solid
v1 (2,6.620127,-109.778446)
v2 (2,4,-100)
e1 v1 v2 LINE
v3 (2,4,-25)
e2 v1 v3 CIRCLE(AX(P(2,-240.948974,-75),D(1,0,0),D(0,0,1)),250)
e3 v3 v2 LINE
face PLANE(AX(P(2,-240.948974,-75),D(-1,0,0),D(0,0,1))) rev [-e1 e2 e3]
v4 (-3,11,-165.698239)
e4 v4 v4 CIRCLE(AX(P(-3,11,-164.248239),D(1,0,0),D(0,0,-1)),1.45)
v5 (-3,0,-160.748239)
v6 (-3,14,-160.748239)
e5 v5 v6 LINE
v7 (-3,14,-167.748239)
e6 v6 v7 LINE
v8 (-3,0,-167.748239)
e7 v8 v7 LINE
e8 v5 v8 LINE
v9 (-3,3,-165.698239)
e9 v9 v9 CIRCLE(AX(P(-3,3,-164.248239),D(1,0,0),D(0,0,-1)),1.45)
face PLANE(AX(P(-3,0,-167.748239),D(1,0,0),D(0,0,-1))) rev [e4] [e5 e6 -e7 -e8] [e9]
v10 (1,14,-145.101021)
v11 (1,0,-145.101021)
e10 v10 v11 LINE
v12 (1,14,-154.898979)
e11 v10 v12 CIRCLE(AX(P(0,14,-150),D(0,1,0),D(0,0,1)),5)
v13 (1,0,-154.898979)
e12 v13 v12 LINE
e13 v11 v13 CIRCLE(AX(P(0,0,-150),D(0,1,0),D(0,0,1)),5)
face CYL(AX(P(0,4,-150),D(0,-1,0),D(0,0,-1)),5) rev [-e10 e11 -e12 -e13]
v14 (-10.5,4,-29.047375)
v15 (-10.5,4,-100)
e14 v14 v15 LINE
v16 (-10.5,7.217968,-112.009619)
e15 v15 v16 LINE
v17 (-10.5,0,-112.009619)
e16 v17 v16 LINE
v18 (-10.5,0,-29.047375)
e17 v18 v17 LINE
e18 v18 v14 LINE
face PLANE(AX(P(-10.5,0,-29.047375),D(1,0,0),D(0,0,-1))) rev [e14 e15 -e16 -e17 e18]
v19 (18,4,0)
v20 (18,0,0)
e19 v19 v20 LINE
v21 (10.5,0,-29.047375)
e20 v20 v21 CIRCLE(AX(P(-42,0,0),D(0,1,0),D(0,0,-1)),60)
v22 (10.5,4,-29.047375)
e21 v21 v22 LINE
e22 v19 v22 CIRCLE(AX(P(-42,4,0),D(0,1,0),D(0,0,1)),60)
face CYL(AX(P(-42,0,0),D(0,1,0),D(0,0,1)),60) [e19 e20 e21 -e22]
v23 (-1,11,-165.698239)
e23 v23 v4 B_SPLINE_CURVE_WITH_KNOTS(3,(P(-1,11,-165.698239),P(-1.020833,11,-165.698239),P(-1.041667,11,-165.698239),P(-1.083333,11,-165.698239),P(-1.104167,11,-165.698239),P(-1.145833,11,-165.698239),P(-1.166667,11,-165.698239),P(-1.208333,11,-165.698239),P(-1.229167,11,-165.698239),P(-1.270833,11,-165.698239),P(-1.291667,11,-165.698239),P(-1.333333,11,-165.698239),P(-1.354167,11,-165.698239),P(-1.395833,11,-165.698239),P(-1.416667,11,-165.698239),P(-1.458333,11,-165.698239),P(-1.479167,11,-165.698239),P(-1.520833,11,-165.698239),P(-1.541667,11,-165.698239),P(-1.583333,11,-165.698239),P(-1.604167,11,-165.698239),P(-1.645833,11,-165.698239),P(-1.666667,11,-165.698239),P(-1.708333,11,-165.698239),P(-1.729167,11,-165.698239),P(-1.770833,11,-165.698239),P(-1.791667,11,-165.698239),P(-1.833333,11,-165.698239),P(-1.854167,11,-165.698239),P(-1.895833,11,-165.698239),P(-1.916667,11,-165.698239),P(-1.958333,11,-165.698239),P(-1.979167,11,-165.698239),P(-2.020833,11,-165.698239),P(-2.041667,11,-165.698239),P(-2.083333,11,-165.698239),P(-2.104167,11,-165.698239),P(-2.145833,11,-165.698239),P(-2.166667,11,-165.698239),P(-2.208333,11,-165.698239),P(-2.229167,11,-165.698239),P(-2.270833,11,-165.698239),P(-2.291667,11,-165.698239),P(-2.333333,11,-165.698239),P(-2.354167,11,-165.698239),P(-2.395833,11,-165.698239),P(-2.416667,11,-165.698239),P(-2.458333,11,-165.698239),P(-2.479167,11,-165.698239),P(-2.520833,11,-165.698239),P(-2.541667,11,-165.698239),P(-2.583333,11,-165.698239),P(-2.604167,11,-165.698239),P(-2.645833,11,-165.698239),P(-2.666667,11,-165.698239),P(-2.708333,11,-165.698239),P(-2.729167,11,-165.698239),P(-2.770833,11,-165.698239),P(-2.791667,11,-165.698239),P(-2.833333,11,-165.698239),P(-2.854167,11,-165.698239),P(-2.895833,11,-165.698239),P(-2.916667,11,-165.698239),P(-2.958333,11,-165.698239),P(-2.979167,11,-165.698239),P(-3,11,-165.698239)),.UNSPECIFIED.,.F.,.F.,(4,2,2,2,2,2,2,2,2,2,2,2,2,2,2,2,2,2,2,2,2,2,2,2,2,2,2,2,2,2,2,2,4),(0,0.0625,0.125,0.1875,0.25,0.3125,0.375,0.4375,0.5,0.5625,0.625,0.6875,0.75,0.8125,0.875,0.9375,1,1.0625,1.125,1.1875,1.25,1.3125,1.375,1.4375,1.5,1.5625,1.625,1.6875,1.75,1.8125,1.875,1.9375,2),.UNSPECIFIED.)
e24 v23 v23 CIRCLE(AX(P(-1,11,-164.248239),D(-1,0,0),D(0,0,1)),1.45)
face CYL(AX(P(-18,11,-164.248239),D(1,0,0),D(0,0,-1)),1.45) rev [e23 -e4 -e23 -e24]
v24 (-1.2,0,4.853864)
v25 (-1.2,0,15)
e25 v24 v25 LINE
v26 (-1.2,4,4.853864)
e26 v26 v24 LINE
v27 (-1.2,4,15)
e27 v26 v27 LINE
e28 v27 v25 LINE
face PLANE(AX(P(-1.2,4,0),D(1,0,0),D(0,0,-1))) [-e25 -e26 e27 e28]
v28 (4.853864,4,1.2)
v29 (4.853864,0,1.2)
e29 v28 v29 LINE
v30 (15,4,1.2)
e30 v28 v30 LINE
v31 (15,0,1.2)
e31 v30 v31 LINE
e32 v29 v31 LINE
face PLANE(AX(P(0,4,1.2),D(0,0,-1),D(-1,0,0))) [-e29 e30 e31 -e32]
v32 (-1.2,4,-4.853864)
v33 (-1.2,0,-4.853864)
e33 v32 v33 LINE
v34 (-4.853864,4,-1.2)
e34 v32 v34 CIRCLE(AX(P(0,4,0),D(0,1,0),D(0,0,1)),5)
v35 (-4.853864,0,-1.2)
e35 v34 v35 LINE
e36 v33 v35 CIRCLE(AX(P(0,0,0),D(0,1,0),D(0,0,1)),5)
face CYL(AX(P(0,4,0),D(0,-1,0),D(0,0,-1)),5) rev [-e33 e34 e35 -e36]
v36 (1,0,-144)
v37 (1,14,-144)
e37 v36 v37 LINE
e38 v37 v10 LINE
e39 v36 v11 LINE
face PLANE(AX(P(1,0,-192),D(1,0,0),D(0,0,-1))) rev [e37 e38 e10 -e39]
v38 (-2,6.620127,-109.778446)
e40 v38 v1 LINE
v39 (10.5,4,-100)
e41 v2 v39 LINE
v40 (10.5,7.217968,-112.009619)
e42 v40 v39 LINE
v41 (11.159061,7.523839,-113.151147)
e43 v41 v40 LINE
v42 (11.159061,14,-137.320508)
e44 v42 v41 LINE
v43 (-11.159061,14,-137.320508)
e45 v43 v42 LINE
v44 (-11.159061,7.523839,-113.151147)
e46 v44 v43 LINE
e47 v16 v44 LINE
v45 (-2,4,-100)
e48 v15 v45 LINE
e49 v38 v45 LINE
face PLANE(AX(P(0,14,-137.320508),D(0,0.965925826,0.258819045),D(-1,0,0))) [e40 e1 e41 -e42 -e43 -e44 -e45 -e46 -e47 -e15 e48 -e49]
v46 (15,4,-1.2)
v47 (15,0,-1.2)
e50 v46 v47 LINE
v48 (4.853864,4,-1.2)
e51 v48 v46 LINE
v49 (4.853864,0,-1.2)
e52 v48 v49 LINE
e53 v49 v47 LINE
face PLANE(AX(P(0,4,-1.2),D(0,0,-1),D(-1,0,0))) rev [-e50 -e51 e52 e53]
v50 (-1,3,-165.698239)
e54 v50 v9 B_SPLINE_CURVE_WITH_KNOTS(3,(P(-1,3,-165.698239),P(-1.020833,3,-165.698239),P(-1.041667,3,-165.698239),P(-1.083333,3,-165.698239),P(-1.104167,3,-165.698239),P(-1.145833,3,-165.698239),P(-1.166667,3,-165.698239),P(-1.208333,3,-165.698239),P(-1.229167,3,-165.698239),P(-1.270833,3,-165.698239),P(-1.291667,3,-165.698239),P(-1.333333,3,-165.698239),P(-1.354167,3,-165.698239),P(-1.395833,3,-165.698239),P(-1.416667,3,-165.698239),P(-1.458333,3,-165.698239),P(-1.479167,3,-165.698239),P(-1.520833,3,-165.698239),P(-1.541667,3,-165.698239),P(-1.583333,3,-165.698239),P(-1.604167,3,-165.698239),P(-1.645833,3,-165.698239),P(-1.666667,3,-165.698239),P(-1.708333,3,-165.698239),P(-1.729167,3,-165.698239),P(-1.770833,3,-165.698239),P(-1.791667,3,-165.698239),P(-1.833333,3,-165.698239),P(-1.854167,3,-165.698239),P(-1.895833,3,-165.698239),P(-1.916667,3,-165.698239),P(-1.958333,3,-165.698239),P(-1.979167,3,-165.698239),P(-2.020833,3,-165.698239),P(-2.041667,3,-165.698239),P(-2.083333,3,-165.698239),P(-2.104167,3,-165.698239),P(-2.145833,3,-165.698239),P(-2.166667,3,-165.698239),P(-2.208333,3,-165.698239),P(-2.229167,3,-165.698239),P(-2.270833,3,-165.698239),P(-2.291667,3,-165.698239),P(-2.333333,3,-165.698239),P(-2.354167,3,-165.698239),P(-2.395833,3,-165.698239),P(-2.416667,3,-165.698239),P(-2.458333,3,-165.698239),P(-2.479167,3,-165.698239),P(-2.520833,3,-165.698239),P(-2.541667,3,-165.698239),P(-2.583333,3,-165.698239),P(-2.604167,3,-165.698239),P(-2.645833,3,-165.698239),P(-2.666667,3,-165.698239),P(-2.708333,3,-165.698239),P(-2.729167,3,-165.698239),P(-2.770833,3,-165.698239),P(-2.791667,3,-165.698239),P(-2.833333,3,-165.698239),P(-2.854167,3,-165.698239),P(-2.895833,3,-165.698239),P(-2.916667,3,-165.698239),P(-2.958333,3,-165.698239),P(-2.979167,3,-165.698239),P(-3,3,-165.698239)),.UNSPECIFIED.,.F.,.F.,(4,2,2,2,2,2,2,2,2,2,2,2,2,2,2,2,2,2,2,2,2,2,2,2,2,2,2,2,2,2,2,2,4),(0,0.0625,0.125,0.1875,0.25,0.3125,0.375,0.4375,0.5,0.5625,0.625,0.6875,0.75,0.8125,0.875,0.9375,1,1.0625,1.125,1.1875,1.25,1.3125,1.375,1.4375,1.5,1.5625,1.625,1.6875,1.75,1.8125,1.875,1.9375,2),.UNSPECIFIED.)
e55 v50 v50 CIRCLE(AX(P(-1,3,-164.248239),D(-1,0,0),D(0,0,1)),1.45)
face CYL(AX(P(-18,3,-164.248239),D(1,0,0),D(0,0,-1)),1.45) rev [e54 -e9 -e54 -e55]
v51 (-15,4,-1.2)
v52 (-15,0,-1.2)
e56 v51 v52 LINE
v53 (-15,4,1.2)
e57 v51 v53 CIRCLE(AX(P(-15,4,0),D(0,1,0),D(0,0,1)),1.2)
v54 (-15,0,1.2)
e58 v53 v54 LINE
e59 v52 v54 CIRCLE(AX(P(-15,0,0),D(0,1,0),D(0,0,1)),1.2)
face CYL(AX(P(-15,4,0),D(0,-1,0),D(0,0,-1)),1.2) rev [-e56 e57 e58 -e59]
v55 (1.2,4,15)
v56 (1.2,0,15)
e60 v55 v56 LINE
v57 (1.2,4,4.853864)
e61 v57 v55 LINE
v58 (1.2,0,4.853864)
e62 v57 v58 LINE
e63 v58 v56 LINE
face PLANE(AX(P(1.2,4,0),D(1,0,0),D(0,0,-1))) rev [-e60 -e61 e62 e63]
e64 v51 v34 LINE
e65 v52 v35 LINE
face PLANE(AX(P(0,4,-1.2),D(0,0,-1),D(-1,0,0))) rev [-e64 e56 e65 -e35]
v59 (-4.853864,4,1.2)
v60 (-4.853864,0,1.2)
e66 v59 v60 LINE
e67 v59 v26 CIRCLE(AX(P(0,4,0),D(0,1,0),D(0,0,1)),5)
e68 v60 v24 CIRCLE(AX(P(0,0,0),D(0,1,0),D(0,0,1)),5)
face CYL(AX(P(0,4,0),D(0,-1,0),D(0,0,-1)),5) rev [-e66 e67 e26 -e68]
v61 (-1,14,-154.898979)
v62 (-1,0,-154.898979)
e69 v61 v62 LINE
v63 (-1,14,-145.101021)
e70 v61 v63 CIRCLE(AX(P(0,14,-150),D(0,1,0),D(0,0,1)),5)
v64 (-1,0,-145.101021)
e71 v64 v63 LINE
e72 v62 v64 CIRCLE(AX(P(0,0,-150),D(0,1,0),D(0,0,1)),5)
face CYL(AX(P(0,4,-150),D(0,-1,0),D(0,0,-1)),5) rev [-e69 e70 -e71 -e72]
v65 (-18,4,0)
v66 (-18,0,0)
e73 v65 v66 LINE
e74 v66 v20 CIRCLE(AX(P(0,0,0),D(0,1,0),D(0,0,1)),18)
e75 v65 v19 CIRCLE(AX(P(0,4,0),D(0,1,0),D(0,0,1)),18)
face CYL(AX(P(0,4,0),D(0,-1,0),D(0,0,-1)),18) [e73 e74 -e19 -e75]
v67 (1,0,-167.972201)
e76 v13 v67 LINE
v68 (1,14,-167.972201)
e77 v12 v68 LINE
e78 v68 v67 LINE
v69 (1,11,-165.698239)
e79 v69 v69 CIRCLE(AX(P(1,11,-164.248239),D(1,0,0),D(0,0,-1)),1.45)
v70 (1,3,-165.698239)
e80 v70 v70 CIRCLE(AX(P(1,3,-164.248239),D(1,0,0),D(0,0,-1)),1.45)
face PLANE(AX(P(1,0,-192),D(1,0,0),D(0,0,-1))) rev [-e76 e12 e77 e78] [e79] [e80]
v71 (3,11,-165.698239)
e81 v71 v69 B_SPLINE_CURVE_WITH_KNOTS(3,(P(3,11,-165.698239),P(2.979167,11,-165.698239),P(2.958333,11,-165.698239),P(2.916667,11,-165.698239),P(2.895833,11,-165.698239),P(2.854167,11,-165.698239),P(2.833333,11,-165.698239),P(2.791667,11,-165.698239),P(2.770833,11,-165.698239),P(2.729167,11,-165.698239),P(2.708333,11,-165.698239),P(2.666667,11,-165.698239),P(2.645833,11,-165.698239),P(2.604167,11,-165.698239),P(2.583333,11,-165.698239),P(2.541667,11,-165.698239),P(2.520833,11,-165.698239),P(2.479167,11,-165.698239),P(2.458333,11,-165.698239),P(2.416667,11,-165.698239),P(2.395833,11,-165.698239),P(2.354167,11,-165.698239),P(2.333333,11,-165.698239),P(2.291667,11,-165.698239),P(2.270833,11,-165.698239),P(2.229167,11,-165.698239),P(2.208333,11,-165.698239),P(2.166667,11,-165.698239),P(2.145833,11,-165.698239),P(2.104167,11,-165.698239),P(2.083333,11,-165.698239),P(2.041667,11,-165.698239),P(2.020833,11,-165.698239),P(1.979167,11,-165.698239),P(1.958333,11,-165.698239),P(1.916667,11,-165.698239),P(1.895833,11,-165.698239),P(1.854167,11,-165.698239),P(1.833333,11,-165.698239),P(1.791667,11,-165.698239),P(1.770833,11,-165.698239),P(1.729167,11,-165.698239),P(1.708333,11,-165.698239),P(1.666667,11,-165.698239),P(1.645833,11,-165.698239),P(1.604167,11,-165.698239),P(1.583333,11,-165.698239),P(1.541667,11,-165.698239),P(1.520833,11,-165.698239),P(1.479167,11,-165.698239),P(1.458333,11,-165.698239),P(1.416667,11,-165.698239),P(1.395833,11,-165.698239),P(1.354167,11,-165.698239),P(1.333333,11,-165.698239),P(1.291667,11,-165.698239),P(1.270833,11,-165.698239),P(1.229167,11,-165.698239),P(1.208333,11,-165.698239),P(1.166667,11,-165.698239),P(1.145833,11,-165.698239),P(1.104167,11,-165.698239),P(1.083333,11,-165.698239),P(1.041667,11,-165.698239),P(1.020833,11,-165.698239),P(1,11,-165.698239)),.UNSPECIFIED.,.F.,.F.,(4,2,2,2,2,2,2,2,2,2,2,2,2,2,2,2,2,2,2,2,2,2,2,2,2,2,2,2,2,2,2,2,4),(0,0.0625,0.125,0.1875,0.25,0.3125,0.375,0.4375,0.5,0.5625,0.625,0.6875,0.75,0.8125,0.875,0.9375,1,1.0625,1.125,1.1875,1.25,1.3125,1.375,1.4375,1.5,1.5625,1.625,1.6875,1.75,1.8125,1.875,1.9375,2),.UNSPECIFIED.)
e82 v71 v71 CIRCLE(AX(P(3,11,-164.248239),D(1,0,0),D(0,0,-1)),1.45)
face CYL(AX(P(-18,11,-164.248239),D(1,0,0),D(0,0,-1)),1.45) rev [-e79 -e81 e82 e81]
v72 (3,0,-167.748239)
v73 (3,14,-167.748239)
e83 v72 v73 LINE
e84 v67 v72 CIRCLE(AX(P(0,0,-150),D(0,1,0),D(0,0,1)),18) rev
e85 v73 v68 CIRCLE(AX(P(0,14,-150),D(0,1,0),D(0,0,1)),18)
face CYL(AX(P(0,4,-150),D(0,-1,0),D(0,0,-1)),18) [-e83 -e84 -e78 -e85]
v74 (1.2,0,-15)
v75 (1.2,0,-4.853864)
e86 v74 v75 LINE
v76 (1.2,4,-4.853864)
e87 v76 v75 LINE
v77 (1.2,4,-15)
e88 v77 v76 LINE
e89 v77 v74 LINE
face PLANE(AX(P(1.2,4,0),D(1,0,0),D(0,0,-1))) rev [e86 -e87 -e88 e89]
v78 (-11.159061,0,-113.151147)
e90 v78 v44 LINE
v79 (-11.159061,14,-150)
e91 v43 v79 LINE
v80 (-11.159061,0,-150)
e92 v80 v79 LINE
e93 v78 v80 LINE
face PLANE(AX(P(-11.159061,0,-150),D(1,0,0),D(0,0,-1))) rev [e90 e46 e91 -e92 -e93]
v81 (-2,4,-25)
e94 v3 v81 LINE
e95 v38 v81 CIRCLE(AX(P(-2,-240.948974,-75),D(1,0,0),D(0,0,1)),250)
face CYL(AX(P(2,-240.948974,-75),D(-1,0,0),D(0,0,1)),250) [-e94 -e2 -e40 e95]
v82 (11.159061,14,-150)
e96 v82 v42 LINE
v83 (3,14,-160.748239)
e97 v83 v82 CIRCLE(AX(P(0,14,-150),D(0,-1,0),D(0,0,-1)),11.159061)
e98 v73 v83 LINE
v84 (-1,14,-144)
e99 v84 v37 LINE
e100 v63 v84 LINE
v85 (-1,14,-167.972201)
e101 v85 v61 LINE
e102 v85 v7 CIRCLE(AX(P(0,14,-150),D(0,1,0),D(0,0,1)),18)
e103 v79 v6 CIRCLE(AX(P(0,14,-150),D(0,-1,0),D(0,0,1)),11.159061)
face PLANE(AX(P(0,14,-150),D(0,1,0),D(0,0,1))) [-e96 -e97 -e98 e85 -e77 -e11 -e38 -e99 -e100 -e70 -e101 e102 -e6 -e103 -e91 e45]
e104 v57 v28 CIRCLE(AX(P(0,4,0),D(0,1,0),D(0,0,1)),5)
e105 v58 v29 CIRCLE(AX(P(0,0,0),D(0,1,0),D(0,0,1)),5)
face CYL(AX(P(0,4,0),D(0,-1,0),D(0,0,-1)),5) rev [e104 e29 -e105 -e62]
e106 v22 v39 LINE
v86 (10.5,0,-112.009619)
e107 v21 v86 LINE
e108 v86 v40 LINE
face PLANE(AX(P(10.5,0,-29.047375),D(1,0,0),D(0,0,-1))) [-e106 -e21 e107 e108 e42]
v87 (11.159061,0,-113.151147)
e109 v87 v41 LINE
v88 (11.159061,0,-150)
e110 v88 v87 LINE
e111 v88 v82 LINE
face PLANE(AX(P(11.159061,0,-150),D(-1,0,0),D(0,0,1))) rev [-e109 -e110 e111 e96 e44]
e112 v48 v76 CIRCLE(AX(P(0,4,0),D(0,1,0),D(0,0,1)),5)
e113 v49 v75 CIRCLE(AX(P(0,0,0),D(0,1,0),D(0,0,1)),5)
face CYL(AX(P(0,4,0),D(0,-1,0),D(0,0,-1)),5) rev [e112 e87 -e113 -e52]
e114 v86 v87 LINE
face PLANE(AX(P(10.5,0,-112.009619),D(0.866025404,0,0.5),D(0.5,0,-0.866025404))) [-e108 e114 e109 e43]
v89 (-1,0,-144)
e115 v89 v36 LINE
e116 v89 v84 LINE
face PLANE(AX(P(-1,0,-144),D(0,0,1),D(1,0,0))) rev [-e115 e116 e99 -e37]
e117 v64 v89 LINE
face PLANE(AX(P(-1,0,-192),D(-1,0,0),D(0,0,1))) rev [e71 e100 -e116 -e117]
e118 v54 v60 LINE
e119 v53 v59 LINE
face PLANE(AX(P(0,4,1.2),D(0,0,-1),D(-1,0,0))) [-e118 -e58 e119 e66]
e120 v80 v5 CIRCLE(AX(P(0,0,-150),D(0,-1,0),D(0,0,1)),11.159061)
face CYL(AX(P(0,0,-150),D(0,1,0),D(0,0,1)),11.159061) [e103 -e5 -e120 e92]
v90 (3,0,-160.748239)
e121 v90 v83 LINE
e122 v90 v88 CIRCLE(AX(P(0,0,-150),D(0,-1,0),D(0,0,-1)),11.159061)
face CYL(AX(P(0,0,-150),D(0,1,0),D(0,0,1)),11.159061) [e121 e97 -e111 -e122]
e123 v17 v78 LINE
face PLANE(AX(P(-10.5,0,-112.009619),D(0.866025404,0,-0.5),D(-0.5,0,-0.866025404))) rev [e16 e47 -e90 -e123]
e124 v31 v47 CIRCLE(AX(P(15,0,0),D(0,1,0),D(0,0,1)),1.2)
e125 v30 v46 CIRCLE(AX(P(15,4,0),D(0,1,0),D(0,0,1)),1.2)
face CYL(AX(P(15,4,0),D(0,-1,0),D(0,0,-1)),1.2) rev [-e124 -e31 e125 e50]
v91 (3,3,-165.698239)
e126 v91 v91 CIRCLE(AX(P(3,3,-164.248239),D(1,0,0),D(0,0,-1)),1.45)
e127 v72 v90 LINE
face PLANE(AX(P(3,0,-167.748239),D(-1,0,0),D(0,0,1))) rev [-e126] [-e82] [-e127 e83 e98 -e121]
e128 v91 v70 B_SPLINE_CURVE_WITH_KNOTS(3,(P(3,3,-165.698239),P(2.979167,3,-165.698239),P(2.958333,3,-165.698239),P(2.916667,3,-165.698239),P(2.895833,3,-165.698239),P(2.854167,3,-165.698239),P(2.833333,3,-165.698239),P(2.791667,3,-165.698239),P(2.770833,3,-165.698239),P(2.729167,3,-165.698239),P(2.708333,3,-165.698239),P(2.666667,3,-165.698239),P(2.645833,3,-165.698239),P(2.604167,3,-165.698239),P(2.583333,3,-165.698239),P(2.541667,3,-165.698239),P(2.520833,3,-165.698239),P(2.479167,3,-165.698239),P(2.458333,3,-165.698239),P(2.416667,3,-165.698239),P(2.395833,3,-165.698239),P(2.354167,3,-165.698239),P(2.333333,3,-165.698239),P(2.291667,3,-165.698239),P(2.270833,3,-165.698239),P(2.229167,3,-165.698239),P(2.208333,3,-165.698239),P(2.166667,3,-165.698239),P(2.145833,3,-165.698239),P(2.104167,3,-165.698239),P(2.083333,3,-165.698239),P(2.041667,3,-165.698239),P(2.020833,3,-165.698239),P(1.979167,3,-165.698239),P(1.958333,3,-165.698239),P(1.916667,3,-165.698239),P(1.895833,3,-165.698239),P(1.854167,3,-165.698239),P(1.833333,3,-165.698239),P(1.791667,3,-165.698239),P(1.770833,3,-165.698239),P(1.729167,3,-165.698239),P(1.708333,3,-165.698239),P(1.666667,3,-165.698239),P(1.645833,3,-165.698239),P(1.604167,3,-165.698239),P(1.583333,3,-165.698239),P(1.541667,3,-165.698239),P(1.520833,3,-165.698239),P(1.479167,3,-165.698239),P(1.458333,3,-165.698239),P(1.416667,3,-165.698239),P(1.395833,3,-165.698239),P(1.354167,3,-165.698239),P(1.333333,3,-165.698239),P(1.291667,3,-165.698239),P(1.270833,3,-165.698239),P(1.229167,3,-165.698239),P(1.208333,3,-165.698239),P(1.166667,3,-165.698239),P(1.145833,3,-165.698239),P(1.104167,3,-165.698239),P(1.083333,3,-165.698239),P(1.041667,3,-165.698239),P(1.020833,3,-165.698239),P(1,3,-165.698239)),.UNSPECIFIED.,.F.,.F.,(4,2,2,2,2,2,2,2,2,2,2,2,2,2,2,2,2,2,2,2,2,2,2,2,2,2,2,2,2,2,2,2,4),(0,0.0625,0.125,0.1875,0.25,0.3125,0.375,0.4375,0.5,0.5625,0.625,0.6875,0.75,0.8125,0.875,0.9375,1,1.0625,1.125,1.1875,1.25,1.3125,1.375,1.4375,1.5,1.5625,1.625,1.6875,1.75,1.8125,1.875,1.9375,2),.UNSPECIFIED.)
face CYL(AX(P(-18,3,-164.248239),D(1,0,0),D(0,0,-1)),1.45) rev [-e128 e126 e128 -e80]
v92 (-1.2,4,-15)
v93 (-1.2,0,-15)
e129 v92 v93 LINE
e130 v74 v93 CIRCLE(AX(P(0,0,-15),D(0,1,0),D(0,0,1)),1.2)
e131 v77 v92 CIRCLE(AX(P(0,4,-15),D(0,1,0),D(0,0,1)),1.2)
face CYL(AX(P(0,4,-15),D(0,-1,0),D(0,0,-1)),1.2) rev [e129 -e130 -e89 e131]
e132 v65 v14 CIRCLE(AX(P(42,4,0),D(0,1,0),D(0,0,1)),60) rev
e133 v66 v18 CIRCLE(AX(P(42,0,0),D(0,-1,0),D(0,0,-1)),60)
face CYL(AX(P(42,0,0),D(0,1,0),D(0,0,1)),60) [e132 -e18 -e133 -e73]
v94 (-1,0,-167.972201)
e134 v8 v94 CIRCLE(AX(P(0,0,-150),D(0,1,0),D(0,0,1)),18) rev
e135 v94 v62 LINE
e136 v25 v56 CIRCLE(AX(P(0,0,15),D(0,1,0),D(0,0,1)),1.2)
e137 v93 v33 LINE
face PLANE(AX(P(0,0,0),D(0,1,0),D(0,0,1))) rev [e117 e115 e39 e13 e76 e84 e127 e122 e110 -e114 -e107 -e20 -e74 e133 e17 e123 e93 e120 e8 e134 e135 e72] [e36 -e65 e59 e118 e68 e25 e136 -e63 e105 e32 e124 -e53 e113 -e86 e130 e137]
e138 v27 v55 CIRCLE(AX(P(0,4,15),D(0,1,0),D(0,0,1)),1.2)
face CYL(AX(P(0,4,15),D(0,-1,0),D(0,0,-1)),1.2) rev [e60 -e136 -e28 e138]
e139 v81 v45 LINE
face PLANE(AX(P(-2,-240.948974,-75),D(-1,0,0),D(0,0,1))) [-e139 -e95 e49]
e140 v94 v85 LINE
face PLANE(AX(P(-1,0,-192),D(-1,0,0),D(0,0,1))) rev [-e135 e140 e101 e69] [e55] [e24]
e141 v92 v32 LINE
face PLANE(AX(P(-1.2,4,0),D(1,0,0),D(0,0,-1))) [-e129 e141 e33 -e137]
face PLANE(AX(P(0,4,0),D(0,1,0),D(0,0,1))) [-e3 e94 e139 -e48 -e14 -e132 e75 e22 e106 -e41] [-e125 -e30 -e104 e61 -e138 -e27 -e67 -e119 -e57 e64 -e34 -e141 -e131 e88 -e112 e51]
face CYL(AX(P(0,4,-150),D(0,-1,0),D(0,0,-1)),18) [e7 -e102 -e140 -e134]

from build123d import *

# Parameters (mm, degrees)
SKETCH_1_R          = 5
EXTRUDE_1_DEPTH     = 4
SKETCH_2_R          = 5
EXTRUDE_2_DEPTH     = 10
CUT_EXTRUDE_2_DEPTH = 170.257200733
CHAMFER_1_SIZE      = 37.320508076
CHAMFER_1_SIZE_2    = 10
EXTRUDE_3_DEPTH     = 2
SKETCH_6_W          = 2
SKETCH_6_H          = 48
CUT_EXTRUDE_4_DEPTH = 170.54055562
SKETCH_7_R          = 1.45
CUT_EXTRUDE_5_DEPTH = 170.857764694


with BuildPart() as part:
    # 스케치1 → 보스-돌출1 (new body)
    with BuildSketch(Plane(origin=(0, 0, 0), x_dir=(1, 0, 0), z_dir=(0, 1, 0))):
        with BuildLine():
            ThreePointArc((18, 150), (0, 168), (-18, 150))
            Line((-18, 150), (-18, 0))
            ThreePointArc((-18, 0), (0, -18), (18, 0))
            Line((18, 0), (18, 150))
        make_face()
        with BuildLine():
            ThreePointArc((-15, -1.2), (-16.2, 0), (-15, 1.2))
            Line((-15, 1.2), (-4.85386444, 1.2))
            ThreePointArc((-4.85386444, 1.2), (-3.535533906, 3.535533906), (-1.2, 4.85386444))
            Line((-1.2, 4.85386444), (-1.2, 15))
            ThreePointArc((-1.2, 15), (0, 16.2), (1.2, 15))
            Line((1.2, 15), (1.2, 4.85386444))
            ThreePointArc((1.2, 4.85386444), (3.535533906, 3.535533906), (4.85386444, 1.2))
            Line((4.85386444, 1.2), (15, 1.2))
            ThreePointArc((15, 1.2), (16.2, 0), (15, -1.2))
            Line((15, -1.2), (4.85386444, -1.2))
            ThreePointArc((4.85386444, -1.2), (3.535533906, -3.535533906), (1.2, -4.85386444))
            Line((1.2, -4.85386444), (1.2, -15))
            ThreePointArc((1.2, -15), (0, -16.2), (-1.2, -15))
            Line((-1.2, -15), (-1.2, -4.85386444))
            ThreePointArc((-1.2, -4.85386444), (-3.535533906, -3.535533906), (-4.85386444, -1.2))
            Line((-4.85386444, -1.2), (-15, -1.2))
        make_face(mode=Mode.SUBTRACT)
        with Locations(Location((0, 150, 0), (0, 0, 270))):
            Circle(SKETCH_1_R, mode=Mode.SUBTRACT)
    extrude(amount=EXTRUDE_1_DEPTH)

    # 스케치2 → 보스-돌출2 (add)
    with BuildSketch(Plane(origin=(0, 4, 0), x_dir=(1, 0, 0), z_dir=(0, 1, 0))):
        with BuildLine():
            Line((-18, 100), (18, 100))
            Line((18, 100), (18, 150))
            ThreePointArc((18, 150), (0, 168), (-18, 150))
            Line((-18, 150), (-18, 100))
        make_face()
        with Locations(Location((0, 150, 0), (0, 0, 270))):
            Circle(SKETCH_2_R, mode=Mode.SUBTRACT)
    extrude(amount=EXTRUDE_2_DEPTH)

    # 스케치4 → 컷-돌출2 (cut, symmetric)
    with BuildSketch(Plane(origin=(0, 4, 0), x_dir=(1, 0, 0), z_dir=(0, 1, 0))):
        with BuildLine():
            Line((-10.5, 29.047375097), (-10.5, 112.009618943))
            Line((-10.5, 112.009618943), (-18, 125))
            Line((-18, 125), (-18, 0))
            ThreePointArc((-18, 0), (-16.094750193, 15), (-10.5, 29.047375097))
        make_face()
    cut_extrude_2 = extrude(amount=CUT_EXTRUDE_2_DEPTH, both=True, mode=Mode.SUBTRACT)

    # 대칭 복사1: 컷-돌출2 across plane
    add(cut_extrude_2.mirror(Plane(origin=(0, 0, 0), x_dir=(0, 0, 1), z_dir=(1, 0, 0))), mode=Mode.SUBTRACT)

    # 모따기1
    # the kernel refuses this chamfer: 37.320508076, 10 mm, written as the material it takes off along each edge
    with BuildSketch(Plane(origin=(-107.410968331, 14, -100), x_dir=(0, 0.009967146577156314, -0.9999503267608394), z_dir=(1, 0, 0))) as chamfer_1_piece_1_section:
        Polygon((CHAMFER_1_SIZE * 0.999950326753, -CHAMFER_1_SIZE * 0.00996714657707), (-CHAMFER_1_SIZE_2 * 0.00996714657716, -CHAMFER_1_SIZE_2 * 0.999950326761), (0, 0), align=None)
    chamfer_1_piece_1 = extrude(amount=214.821936662, mode=Mode.PRIVATE)
    chamfer_1_piece_1 = split(chamfer_1_piece_1, bisect_by=Plane(origin=(0, 4, -113.026597383), z_dir=(0, 1, 0)), keep=Keep.TOP, mode=Mode.PRIVATE)
    add(chamfer_1_piece_1, mode=Mode.SUBTRACT)

    # 스케치5 → 보스-돌출3 (add, symmetric)
    with BuildSketch(Plane(origin=(0, 0, 0), x_dir=(0, 0, -1), z_dir=(1, 0, 0))):
        with BuildLine():
            Line((25, 4), (125, 4))
            ThreePointArc((125, 4), (75, 9.051025722), (25, 4))
        make_face()
    extrude(amount=EXTRUDE_3_DEPTH, both=True)

    # 스케치6 → 컷-돌출4 (cut, through all)
    with BuildSketch(Plane(origin=(0, 14, 0), x_dir=(1, 0, 0), z_dir=(0, 1, 0))):
        with BuildLine():
            Line((-3, 167.748239349), (-3, 160.748239349))
            ThreePointArc((-3, 160.748239349), (-8.888245975, 156.74712773), (-11.159061301, 150))
            Line((-11.159061301, 150), (-11.159061301, 113.151146601))
            Line((-11.159061301, 113.151146601), (-22.159061301, 113.151146601))
            Line((-22.159061301, 113.151146601), (-22.159061301, 167.748239349))
            Line((-22.159061301, 167.748239349), (-3, 167.748239349))
        make_face()
        with BuildLine():
            Line((22.159061301, 167.748239349), (3, 167.748239349))
            Line((3, 167.748239349), (3, 160.748239349))
            ThreePointArc((3, 160.748239349), (8.888245975, 156.74712773), (11.159061301, 150))
            Line((11.159061301, 150), (11.159061301, 113.151146601))
            Line((11.159061301, 113.151146601), (22.159061301, 113.151146601))
            Line((22.159061301, 113.151146601), (22.159061301, 167.748239349))
        make_face()
        with Locations((0, 168)):
            Rectangle(SKETCH_6_W, SKETCH_6_H)
    extrude(amount=-CUT_EXTRUDE_4_DEPTH, mode=Mode.SUBTRACT)

    # 스케치7 → 컷-돌출5 (cut, through all)
    with BuildSketch(Plane(origin=(3, 0, 0), x_dir=(0, 0, -1), z_dir=(1, 0, 0))):
        with Locations((164.248239349, 11)):
            Circle(SKETCH_7_R)
        with Locations((164.248239349, 3)):
            Circle(SKETCH_7_R)
    extrude(amount=-CUT_EXTRUDE_5_DEPTH, mode=Mode.SUBTRACT)


solid = part.part
